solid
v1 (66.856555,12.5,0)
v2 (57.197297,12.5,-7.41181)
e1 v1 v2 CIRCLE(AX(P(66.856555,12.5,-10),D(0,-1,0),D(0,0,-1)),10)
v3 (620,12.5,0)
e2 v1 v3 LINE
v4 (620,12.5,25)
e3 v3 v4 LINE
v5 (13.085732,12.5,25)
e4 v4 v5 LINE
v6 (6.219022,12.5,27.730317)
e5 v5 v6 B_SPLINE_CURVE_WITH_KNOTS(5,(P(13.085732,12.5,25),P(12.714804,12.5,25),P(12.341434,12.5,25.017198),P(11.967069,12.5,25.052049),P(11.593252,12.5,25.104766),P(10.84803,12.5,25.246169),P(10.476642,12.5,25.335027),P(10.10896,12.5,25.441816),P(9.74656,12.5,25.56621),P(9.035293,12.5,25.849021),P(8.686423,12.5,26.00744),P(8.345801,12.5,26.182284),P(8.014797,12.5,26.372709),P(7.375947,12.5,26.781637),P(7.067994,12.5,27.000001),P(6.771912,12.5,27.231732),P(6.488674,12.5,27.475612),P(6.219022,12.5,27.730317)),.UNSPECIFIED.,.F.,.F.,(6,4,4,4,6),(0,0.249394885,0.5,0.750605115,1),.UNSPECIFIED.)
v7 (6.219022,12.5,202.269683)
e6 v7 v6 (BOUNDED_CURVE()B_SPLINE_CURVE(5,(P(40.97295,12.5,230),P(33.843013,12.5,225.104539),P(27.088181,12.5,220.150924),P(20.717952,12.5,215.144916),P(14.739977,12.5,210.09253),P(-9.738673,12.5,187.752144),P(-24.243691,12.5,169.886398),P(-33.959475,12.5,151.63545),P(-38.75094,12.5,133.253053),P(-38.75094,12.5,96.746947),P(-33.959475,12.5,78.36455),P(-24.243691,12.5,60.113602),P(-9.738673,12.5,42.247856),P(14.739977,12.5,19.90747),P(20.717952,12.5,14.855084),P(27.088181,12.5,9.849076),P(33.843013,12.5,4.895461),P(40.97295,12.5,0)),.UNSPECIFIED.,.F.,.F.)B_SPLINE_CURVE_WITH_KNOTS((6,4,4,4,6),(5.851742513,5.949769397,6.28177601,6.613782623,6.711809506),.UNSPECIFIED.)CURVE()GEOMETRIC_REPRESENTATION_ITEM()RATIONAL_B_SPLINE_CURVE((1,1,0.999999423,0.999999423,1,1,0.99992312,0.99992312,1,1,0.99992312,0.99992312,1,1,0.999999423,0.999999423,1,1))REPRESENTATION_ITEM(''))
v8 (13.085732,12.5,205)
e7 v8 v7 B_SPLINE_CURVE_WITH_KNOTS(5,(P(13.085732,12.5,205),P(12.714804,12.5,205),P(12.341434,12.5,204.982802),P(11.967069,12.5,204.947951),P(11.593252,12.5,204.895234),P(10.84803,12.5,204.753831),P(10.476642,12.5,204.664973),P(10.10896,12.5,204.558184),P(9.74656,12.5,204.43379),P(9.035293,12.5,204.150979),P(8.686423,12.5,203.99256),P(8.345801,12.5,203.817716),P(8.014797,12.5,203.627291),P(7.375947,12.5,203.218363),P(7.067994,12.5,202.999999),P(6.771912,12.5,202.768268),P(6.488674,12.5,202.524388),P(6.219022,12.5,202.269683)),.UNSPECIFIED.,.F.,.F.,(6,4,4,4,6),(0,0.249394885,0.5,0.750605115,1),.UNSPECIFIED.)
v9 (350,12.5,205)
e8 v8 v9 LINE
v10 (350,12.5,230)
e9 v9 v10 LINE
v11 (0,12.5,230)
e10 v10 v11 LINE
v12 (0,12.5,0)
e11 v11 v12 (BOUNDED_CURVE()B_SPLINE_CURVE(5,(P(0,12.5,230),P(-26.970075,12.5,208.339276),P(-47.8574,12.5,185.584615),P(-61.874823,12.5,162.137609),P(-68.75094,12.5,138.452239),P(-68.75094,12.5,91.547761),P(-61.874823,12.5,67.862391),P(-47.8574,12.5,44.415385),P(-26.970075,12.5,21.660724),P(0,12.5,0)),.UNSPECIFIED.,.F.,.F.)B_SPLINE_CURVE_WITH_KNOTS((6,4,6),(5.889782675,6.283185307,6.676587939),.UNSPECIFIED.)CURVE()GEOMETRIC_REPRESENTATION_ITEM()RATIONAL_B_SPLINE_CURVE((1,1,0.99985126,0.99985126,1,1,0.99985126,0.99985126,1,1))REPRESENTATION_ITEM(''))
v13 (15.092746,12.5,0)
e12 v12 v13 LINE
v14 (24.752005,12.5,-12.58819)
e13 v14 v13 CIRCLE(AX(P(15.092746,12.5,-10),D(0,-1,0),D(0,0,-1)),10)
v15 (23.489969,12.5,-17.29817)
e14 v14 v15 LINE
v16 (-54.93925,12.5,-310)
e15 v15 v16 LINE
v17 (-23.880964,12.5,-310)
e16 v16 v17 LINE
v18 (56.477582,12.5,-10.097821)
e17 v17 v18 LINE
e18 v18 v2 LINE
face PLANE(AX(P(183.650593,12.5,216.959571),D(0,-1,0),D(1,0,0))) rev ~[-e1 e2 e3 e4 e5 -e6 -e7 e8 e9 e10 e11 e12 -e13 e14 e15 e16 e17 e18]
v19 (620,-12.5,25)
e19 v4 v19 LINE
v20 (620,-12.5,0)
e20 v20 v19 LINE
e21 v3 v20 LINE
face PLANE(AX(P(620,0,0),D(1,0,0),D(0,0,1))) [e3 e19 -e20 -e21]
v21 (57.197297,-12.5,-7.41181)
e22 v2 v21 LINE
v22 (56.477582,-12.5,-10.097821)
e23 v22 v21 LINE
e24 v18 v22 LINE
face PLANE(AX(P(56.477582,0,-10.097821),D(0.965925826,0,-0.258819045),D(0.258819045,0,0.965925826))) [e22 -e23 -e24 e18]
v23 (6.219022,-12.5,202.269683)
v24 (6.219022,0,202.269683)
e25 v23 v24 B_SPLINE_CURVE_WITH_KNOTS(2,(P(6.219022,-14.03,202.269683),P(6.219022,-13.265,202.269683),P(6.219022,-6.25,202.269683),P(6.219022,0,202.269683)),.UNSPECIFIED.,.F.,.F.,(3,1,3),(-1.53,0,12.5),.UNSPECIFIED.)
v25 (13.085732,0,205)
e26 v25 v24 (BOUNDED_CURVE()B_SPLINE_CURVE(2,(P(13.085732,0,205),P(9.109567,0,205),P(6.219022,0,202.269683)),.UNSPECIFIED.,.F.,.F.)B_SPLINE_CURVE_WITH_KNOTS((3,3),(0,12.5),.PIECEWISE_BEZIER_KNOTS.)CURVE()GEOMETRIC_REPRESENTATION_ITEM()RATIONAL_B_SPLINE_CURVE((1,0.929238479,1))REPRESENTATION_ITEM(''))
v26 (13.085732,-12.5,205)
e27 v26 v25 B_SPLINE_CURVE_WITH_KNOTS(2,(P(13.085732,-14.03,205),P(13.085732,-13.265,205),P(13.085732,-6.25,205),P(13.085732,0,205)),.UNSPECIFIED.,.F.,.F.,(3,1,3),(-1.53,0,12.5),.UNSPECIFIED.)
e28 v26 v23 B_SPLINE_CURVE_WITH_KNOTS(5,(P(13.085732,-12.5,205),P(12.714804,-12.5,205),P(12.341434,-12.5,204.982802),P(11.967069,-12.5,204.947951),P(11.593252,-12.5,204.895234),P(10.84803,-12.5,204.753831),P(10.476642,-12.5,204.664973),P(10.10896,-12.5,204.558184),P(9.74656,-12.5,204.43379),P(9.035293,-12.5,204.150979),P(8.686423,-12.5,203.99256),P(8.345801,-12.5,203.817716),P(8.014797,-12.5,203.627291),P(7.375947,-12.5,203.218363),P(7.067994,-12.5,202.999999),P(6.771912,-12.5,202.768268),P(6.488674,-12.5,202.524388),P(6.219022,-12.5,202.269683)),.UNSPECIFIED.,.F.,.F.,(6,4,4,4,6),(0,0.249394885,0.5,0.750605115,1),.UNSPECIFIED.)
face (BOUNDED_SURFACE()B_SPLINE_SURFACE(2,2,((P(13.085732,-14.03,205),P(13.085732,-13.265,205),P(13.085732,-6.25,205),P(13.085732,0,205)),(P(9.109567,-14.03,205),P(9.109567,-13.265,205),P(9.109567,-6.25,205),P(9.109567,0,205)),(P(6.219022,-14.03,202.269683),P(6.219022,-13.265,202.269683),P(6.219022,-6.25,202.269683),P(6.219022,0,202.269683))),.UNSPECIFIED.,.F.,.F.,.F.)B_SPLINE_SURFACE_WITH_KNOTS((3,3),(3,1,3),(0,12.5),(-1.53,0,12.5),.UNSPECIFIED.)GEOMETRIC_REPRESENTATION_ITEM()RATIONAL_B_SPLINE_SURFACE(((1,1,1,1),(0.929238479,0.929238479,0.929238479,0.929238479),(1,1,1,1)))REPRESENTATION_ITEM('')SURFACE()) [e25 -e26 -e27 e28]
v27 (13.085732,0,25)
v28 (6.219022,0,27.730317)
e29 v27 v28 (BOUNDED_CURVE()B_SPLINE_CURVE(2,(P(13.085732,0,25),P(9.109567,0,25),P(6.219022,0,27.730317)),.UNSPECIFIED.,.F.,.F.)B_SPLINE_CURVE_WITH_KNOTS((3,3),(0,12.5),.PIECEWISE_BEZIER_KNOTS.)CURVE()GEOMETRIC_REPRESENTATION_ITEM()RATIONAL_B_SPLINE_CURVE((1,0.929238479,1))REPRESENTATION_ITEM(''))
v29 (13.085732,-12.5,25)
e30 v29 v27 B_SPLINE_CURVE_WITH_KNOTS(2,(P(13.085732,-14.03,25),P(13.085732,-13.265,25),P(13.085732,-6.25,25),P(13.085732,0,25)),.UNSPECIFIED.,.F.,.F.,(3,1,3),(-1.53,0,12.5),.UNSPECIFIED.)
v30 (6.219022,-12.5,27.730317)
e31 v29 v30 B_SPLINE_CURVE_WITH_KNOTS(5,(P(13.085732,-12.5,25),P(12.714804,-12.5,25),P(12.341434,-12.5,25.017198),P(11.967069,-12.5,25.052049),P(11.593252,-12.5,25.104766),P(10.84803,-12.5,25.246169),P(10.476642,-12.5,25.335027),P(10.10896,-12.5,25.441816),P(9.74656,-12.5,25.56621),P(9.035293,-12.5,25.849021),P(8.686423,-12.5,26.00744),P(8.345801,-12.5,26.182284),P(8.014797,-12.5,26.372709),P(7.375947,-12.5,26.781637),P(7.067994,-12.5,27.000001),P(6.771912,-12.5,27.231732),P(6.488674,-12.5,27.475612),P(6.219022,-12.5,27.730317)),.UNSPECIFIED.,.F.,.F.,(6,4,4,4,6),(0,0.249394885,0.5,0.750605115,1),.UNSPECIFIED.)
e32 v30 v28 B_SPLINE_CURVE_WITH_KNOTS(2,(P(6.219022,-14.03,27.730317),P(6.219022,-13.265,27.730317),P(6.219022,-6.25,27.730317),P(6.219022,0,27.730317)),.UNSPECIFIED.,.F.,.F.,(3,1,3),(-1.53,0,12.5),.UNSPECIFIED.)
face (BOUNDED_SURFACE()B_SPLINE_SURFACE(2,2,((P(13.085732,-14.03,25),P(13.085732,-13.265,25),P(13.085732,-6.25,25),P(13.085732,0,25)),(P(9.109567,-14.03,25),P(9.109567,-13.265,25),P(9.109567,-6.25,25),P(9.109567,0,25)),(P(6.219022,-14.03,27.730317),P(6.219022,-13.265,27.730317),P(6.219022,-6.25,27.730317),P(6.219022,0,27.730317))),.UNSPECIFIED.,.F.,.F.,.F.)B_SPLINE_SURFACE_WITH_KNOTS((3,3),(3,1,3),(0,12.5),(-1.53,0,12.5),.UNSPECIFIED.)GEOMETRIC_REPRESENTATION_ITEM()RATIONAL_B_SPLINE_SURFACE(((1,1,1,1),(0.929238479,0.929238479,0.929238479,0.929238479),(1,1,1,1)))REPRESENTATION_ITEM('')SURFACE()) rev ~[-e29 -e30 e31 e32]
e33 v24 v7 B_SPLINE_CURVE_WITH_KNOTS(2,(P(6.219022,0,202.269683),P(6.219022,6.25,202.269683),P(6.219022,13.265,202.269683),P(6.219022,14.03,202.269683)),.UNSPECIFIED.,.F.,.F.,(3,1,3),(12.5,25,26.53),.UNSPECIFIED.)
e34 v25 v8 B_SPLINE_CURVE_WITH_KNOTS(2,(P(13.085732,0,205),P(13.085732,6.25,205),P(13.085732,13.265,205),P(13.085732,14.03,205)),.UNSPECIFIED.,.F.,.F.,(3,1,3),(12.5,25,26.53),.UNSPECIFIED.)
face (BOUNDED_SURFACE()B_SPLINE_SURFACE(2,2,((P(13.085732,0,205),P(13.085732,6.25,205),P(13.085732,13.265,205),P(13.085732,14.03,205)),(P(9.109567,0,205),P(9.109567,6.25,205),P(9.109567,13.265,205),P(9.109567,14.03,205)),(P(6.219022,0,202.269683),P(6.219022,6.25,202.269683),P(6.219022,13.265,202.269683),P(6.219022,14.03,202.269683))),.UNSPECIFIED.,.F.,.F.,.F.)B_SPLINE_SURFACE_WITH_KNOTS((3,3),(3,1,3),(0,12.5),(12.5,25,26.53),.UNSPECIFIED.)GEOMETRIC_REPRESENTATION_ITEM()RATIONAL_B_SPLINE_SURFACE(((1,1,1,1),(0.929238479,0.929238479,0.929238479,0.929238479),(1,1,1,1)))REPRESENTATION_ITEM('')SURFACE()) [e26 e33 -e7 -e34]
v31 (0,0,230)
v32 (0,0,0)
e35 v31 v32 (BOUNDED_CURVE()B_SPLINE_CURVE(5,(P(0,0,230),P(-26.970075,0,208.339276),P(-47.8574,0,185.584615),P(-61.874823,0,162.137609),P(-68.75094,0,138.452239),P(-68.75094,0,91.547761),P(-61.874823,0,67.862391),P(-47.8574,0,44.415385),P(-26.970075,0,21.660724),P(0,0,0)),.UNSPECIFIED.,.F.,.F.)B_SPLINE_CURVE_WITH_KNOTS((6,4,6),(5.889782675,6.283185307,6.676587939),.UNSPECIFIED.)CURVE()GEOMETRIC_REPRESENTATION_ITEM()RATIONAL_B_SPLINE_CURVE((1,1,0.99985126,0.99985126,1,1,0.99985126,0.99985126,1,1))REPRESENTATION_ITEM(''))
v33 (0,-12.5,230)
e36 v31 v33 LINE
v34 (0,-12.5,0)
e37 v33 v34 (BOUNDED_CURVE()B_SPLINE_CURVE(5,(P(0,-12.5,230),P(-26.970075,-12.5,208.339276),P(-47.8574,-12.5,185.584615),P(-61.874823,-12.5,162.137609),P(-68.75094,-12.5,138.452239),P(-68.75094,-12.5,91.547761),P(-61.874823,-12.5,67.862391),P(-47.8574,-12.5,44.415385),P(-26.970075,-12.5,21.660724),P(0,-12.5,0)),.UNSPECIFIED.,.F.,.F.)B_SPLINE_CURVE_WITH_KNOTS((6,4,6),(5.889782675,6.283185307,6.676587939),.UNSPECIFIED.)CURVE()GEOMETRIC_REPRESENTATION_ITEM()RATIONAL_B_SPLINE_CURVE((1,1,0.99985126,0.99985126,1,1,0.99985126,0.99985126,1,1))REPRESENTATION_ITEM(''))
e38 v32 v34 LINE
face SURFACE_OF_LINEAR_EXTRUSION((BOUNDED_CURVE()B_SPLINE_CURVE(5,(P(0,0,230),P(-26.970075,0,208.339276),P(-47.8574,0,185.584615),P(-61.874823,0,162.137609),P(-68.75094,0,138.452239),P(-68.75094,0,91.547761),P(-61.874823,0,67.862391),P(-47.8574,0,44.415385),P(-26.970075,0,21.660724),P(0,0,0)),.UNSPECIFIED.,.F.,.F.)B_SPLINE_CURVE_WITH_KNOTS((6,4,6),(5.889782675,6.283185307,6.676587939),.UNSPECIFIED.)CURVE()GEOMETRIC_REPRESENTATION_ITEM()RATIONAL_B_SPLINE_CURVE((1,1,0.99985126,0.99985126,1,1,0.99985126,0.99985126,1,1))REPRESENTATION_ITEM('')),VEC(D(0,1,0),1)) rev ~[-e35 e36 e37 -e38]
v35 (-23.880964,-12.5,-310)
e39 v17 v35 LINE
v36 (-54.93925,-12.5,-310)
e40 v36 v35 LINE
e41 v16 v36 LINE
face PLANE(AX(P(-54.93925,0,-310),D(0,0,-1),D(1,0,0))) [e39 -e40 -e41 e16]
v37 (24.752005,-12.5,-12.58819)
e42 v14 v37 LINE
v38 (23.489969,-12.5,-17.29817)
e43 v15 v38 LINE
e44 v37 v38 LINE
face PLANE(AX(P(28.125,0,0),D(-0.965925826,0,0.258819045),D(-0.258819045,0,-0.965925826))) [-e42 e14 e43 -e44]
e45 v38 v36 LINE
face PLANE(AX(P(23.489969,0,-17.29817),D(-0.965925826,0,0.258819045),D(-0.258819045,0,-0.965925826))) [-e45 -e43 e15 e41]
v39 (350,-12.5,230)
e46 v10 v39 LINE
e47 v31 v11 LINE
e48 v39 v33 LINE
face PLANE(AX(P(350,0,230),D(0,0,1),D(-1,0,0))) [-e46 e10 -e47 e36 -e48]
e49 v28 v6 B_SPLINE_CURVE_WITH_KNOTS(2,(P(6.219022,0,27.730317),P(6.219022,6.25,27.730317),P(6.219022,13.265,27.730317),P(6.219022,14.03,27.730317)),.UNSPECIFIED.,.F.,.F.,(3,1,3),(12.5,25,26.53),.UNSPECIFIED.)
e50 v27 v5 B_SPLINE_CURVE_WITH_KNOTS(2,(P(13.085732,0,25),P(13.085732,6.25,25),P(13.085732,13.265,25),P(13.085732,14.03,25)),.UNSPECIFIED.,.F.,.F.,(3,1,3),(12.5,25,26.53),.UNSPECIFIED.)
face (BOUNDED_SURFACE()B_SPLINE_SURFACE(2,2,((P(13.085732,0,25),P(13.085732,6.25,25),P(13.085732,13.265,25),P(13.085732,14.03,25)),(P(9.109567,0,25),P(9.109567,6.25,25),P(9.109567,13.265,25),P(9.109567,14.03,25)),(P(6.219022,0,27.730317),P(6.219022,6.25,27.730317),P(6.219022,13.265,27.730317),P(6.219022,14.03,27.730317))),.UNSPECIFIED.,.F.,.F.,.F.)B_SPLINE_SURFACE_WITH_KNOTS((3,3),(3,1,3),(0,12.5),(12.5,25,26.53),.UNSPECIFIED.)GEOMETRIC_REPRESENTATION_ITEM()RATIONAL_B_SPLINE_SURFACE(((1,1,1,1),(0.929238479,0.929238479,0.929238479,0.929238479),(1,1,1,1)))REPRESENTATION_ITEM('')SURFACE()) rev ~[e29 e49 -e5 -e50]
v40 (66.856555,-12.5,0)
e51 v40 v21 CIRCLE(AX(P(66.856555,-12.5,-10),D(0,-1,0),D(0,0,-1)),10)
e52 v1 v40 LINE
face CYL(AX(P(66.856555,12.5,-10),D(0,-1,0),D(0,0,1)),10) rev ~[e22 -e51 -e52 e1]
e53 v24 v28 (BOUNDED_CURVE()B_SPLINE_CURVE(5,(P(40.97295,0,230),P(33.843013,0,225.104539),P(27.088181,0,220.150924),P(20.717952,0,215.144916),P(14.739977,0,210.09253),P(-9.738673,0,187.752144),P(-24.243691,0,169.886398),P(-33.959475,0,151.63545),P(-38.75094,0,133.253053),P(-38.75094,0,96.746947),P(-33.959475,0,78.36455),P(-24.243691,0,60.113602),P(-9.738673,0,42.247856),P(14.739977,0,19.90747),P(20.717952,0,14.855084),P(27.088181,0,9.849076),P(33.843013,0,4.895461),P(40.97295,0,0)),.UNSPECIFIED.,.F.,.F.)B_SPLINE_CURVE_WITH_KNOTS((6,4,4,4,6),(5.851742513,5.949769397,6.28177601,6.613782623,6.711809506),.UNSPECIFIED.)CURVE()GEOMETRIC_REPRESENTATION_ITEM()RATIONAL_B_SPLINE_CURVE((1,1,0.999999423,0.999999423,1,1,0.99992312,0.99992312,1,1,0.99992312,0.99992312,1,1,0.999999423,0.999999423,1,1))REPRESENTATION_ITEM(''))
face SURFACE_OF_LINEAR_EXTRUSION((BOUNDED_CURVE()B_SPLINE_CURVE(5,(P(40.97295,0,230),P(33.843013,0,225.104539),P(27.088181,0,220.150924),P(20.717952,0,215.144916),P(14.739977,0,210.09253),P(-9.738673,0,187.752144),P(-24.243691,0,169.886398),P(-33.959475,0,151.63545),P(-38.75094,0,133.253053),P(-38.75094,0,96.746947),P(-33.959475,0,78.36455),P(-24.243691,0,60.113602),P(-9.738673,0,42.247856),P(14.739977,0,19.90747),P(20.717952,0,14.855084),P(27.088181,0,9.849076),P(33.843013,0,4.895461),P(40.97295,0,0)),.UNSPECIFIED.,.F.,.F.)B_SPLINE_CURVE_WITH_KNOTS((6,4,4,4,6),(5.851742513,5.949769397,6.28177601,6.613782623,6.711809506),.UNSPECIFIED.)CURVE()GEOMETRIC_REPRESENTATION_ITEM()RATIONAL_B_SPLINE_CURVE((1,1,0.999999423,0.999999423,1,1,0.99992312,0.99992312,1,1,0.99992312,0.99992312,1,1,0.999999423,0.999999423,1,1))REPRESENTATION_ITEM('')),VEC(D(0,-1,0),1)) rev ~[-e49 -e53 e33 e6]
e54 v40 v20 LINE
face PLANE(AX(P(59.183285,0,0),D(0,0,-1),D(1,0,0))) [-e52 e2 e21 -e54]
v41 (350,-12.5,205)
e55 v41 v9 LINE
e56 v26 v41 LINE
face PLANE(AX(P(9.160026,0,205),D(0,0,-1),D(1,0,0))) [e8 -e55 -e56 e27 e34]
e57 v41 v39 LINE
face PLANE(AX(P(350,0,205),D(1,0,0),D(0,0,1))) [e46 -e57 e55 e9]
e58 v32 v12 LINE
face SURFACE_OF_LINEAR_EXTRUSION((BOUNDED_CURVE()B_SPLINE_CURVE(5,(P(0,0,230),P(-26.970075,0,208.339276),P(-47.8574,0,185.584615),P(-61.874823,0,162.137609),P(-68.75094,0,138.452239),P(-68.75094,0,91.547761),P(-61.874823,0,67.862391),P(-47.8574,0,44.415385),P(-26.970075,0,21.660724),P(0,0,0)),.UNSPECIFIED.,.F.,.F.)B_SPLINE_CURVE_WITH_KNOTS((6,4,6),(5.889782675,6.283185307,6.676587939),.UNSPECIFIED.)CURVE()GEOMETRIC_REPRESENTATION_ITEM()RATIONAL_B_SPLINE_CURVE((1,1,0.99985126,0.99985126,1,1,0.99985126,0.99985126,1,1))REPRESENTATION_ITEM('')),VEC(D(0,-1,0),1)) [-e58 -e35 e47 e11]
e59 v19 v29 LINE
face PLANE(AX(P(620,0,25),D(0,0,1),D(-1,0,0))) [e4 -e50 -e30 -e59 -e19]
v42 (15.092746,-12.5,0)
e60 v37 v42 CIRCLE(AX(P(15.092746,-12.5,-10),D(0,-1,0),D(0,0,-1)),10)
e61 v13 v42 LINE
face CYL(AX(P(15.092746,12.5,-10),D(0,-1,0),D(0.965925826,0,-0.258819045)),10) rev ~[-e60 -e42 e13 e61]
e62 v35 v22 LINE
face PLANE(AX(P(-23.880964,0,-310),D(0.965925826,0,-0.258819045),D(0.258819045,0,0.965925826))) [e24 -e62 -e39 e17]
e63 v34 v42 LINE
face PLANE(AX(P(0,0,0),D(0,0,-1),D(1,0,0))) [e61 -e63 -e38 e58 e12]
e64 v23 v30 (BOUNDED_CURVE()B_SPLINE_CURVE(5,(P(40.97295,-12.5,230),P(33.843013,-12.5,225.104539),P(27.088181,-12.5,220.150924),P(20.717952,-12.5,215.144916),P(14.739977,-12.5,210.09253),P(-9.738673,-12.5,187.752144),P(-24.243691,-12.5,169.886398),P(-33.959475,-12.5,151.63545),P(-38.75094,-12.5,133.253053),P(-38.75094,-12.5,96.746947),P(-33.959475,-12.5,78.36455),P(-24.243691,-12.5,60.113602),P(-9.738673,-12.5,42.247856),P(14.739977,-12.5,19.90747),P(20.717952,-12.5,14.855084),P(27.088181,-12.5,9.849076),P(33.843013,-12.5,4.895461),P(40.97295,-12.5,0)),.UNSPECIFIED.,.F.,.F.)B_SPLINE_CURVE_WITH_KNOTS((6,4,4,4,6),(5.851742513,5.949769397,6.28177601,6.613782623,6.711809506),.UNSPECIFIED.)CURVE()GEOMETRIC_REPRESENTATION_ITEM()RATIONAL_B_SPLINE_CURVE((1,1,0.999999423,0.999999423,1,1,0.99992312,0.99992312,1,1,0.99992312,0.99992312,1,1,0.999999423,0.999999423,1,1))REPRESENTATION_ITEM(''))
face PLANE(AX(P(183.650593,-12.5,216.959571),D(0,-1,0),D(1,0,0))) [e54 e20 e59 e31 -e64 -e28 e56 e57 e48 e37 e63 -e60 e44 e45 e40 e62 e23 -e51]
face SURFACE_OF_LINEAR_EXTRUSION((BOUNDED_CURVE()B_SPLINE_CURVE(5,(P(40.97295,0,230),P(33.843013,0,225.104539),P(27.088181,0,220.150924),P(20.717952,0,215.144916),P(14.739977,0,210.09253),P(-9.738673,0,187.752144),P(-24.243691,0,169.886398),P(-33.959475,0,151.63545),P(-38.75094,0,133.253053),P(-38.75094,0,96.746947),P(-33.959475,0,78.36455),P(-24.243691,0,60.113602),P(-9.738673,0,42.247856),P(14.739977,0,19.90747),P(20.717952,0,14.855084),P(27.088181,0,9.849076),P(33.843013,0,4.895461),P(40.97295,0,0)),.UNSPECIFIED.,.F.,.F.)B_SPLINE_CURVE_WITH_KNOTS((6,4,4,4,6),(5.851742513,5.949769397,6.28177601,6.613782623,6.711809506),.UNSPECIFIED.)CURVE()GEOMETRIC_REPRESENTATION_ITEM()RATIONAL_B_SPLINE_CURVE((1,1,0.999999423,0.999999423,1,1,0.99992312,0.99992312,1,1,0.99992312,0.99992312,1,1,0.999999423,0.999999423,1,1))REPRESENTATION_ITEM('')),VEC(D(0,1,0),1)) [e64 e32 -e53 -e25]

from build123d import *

# Parameters (mm, degrees)
F1_DEPTH = 12.5
F2_R     = 10


with BuildPart() as f1:
    # F0 (on Front) → F1 (new body, symmetric)
    with BuildSketch(Plane.XZ):
        with BuildLine():
            Line((350, 230), (40.9729498071, 230))
            add(Edge.make_bspline(
                [(40.9729498071, 230), (23.1266754436, 217.7466324391), (9.1600259417, 205)],
                knots=[5.8517425134, 5.8517425134, 5.8517425134, 5.949769397, 5.949769397, 5.949769397], degree=2, weights=[1, 0.9987990817, 1]))
            Line((9.1600259417, 205), (350, 205))
            Line((350, 205), (350, 230))
        make_face()
        with BuildLine():
            add(Edge.make_bspline(
                [(-68.7509398502, 115), (-68.7509398502, 55.2165740433), (0, 0)],
                knots=[0, 0, 0, 0.393402632, 0.393402632, 0.393402632], degree=2, weights=[1, 0.9807165918, 1]))
            Line((0, 0), (28.125, 0))
            Line((28.125, 0), (40.9729498071, 0))
            add(Edge.make_bspline(
                [(9.1600259417, 25), (23.1266754436, 12.2533675609), (40.9729498071, 0)],
                knots=[0.3334159102, 0.3334159102, 0.3334159102, 0.4314427937, 0.4314427937, 0.4314427937], degree=2, weights=[1, 0.9987990817, 1]))
            add(Edge.make_bspline(
                [(-38.7509398502, 115), (-38.7509398502, 68.7258392336), (9.1600259417, 25)],
                knots=[0, 0, 0, 0.3334159102, 0.3334159102, 0.3334159102], degree=2, weights=[1, 0.9861363811, 1]))
            add(Edge.make_bspline(
                [(9.1600259417, 205), (-38.7509398502, 161.2741607664), (-38.7509398502, 115)],
                knots=[5.949769397, 5.949769397, 5.949769397, 6.2831853072, 6.2831853072, 6.2831853072], degree=2, weights=[1, 0.9861363811, 1]))
            add(Edge.make_bspline(
                [(40.9729498071, 230), (23.1266754436, 217.7466324391), (9.1600259417, 205)],
                knots=[5.8517425134, 5.8517425134, 5.8517425134, 5.949769397, 5.949769397, 5.949769397], degree=2, weights=[1, 0.9987990817, 1]))
            Line((40.9729498071, 230), (0, 230))
            add(Edge.make_bspline(
                [(0, 230), (-68.7509398502, 174.7834259567), (-68.7509398502, 115)],
                knots=[5.8897826752, 5.8897826752, 5.8897826752, 6.2831853072, 6.2831853072, 6.2831853072], degree=2, weights=[1, 0.9807165918, 1]))
        make_face()
        with BuildLine():
            add(Edge.make_bspline(
                [(9.1600259417, 25), (23.1266754436, 12.2533675609), (40.9729498071, 0)],
                knots=[0.3334159102, 0.3334159102, 0.3334159102, 0.4314427937, 0.4314427937, 0.4314427937], degree=2, weights=[1, 0.9987990817, 1]))
            Line((40.9729498071, 0), (59.1832854123, 0))
            Line((59.1832854123, 0), (620, 0))
            Line((620, 0), (620, 25))
            Line((620, 25), (9.1600259417, 25))
        make_face()
        with BuildLine():
            Line((40.9729498071, 0), (28.125, 0))
            Line((28.125, 0), (23.4899694027, -17.2981696839))
            add(Edge.make_bspline(
                [(23.4899694027, -17.2981696839), (35.9947939251, -25.7814361907), (50.0769032841, -33.9854807757)],
                knots=[0.4567057683, 0.4567057683, 0.4567057683, 0.5196982713, 0.5196982713, 0.5196982713], degree=2, weights=[1, 0.9995040341, 1]))
            Line((50.0769032841, -33.9854807757), (56.4775823084, -10.0978214541))
            add(Edge.make_bspline(
                [(40.9729498071, 0), (48.3992260092, -5.0989293373), (56.4775823084, -10.0978214541)],
                knots=[0.4314427937, 0.4314427937, 0.4314427937, 0.4722612324, 0.4722612324, 0.4722612324], degree=2, weights=[1, 0.9997917391, 1]))
        make_face()
        with BuildLine():
            add(Edge.make_bspline(
                [(23.4899694027, -17.2981696839), (35.9947939251, -25.7814361907), (50.0769032841, -33.9854807757)],
                knots=[0.4567057683, 0.4567057683, 0.4567057683, 0.5196982713, 0.5196982713, 0.5196982713], degree=2, weights=[1, 0.9995040341, 1]))
            Line((23.4899694027, -17.2981696839), (-54.9392496536, -310))
            Line((-54.9392496536, -310), (-23.8809642413, -310))
            Line((-23.8809642413, -310), (50.0769032841, -33.9854807757))
        make_face()
        with BuildLine():
            Line((59.1832854123, 0), (40.9729498071, 0))
            add(Edge.make_bspline(
                [(40.9729498071, 0), (48.3992260092, -5.0989293373), (56.4775823084, -10.0978214541)],
                knots=[0.4314427937, 0.4314427937, 0.4314427937, 0.4722612324, 0.4722612324, 0.4722612324], degree=2, weights=[1, 0.9997917391, 1]))
            Line((56.4775823084, -10.0978214541), (59.1832854123, 0))
        make_face()
    extrude(amount=F1_DEPTH, both=True)

    # F2
    f2_edges = [f1.edges().sort_by_distance(p)[0] for p in [
        (9.160026, 6.25, 25),
        (9.160026, -6.25, 25),
        (9.160026, 6.25, 205),
        (9.160026, -6.25, 205),
        (59.183285, 0, 0),
        (28.125, 0, 0),
    ]]
    fillet(f2_edges, radius=F2_R)


solid = f1.part
